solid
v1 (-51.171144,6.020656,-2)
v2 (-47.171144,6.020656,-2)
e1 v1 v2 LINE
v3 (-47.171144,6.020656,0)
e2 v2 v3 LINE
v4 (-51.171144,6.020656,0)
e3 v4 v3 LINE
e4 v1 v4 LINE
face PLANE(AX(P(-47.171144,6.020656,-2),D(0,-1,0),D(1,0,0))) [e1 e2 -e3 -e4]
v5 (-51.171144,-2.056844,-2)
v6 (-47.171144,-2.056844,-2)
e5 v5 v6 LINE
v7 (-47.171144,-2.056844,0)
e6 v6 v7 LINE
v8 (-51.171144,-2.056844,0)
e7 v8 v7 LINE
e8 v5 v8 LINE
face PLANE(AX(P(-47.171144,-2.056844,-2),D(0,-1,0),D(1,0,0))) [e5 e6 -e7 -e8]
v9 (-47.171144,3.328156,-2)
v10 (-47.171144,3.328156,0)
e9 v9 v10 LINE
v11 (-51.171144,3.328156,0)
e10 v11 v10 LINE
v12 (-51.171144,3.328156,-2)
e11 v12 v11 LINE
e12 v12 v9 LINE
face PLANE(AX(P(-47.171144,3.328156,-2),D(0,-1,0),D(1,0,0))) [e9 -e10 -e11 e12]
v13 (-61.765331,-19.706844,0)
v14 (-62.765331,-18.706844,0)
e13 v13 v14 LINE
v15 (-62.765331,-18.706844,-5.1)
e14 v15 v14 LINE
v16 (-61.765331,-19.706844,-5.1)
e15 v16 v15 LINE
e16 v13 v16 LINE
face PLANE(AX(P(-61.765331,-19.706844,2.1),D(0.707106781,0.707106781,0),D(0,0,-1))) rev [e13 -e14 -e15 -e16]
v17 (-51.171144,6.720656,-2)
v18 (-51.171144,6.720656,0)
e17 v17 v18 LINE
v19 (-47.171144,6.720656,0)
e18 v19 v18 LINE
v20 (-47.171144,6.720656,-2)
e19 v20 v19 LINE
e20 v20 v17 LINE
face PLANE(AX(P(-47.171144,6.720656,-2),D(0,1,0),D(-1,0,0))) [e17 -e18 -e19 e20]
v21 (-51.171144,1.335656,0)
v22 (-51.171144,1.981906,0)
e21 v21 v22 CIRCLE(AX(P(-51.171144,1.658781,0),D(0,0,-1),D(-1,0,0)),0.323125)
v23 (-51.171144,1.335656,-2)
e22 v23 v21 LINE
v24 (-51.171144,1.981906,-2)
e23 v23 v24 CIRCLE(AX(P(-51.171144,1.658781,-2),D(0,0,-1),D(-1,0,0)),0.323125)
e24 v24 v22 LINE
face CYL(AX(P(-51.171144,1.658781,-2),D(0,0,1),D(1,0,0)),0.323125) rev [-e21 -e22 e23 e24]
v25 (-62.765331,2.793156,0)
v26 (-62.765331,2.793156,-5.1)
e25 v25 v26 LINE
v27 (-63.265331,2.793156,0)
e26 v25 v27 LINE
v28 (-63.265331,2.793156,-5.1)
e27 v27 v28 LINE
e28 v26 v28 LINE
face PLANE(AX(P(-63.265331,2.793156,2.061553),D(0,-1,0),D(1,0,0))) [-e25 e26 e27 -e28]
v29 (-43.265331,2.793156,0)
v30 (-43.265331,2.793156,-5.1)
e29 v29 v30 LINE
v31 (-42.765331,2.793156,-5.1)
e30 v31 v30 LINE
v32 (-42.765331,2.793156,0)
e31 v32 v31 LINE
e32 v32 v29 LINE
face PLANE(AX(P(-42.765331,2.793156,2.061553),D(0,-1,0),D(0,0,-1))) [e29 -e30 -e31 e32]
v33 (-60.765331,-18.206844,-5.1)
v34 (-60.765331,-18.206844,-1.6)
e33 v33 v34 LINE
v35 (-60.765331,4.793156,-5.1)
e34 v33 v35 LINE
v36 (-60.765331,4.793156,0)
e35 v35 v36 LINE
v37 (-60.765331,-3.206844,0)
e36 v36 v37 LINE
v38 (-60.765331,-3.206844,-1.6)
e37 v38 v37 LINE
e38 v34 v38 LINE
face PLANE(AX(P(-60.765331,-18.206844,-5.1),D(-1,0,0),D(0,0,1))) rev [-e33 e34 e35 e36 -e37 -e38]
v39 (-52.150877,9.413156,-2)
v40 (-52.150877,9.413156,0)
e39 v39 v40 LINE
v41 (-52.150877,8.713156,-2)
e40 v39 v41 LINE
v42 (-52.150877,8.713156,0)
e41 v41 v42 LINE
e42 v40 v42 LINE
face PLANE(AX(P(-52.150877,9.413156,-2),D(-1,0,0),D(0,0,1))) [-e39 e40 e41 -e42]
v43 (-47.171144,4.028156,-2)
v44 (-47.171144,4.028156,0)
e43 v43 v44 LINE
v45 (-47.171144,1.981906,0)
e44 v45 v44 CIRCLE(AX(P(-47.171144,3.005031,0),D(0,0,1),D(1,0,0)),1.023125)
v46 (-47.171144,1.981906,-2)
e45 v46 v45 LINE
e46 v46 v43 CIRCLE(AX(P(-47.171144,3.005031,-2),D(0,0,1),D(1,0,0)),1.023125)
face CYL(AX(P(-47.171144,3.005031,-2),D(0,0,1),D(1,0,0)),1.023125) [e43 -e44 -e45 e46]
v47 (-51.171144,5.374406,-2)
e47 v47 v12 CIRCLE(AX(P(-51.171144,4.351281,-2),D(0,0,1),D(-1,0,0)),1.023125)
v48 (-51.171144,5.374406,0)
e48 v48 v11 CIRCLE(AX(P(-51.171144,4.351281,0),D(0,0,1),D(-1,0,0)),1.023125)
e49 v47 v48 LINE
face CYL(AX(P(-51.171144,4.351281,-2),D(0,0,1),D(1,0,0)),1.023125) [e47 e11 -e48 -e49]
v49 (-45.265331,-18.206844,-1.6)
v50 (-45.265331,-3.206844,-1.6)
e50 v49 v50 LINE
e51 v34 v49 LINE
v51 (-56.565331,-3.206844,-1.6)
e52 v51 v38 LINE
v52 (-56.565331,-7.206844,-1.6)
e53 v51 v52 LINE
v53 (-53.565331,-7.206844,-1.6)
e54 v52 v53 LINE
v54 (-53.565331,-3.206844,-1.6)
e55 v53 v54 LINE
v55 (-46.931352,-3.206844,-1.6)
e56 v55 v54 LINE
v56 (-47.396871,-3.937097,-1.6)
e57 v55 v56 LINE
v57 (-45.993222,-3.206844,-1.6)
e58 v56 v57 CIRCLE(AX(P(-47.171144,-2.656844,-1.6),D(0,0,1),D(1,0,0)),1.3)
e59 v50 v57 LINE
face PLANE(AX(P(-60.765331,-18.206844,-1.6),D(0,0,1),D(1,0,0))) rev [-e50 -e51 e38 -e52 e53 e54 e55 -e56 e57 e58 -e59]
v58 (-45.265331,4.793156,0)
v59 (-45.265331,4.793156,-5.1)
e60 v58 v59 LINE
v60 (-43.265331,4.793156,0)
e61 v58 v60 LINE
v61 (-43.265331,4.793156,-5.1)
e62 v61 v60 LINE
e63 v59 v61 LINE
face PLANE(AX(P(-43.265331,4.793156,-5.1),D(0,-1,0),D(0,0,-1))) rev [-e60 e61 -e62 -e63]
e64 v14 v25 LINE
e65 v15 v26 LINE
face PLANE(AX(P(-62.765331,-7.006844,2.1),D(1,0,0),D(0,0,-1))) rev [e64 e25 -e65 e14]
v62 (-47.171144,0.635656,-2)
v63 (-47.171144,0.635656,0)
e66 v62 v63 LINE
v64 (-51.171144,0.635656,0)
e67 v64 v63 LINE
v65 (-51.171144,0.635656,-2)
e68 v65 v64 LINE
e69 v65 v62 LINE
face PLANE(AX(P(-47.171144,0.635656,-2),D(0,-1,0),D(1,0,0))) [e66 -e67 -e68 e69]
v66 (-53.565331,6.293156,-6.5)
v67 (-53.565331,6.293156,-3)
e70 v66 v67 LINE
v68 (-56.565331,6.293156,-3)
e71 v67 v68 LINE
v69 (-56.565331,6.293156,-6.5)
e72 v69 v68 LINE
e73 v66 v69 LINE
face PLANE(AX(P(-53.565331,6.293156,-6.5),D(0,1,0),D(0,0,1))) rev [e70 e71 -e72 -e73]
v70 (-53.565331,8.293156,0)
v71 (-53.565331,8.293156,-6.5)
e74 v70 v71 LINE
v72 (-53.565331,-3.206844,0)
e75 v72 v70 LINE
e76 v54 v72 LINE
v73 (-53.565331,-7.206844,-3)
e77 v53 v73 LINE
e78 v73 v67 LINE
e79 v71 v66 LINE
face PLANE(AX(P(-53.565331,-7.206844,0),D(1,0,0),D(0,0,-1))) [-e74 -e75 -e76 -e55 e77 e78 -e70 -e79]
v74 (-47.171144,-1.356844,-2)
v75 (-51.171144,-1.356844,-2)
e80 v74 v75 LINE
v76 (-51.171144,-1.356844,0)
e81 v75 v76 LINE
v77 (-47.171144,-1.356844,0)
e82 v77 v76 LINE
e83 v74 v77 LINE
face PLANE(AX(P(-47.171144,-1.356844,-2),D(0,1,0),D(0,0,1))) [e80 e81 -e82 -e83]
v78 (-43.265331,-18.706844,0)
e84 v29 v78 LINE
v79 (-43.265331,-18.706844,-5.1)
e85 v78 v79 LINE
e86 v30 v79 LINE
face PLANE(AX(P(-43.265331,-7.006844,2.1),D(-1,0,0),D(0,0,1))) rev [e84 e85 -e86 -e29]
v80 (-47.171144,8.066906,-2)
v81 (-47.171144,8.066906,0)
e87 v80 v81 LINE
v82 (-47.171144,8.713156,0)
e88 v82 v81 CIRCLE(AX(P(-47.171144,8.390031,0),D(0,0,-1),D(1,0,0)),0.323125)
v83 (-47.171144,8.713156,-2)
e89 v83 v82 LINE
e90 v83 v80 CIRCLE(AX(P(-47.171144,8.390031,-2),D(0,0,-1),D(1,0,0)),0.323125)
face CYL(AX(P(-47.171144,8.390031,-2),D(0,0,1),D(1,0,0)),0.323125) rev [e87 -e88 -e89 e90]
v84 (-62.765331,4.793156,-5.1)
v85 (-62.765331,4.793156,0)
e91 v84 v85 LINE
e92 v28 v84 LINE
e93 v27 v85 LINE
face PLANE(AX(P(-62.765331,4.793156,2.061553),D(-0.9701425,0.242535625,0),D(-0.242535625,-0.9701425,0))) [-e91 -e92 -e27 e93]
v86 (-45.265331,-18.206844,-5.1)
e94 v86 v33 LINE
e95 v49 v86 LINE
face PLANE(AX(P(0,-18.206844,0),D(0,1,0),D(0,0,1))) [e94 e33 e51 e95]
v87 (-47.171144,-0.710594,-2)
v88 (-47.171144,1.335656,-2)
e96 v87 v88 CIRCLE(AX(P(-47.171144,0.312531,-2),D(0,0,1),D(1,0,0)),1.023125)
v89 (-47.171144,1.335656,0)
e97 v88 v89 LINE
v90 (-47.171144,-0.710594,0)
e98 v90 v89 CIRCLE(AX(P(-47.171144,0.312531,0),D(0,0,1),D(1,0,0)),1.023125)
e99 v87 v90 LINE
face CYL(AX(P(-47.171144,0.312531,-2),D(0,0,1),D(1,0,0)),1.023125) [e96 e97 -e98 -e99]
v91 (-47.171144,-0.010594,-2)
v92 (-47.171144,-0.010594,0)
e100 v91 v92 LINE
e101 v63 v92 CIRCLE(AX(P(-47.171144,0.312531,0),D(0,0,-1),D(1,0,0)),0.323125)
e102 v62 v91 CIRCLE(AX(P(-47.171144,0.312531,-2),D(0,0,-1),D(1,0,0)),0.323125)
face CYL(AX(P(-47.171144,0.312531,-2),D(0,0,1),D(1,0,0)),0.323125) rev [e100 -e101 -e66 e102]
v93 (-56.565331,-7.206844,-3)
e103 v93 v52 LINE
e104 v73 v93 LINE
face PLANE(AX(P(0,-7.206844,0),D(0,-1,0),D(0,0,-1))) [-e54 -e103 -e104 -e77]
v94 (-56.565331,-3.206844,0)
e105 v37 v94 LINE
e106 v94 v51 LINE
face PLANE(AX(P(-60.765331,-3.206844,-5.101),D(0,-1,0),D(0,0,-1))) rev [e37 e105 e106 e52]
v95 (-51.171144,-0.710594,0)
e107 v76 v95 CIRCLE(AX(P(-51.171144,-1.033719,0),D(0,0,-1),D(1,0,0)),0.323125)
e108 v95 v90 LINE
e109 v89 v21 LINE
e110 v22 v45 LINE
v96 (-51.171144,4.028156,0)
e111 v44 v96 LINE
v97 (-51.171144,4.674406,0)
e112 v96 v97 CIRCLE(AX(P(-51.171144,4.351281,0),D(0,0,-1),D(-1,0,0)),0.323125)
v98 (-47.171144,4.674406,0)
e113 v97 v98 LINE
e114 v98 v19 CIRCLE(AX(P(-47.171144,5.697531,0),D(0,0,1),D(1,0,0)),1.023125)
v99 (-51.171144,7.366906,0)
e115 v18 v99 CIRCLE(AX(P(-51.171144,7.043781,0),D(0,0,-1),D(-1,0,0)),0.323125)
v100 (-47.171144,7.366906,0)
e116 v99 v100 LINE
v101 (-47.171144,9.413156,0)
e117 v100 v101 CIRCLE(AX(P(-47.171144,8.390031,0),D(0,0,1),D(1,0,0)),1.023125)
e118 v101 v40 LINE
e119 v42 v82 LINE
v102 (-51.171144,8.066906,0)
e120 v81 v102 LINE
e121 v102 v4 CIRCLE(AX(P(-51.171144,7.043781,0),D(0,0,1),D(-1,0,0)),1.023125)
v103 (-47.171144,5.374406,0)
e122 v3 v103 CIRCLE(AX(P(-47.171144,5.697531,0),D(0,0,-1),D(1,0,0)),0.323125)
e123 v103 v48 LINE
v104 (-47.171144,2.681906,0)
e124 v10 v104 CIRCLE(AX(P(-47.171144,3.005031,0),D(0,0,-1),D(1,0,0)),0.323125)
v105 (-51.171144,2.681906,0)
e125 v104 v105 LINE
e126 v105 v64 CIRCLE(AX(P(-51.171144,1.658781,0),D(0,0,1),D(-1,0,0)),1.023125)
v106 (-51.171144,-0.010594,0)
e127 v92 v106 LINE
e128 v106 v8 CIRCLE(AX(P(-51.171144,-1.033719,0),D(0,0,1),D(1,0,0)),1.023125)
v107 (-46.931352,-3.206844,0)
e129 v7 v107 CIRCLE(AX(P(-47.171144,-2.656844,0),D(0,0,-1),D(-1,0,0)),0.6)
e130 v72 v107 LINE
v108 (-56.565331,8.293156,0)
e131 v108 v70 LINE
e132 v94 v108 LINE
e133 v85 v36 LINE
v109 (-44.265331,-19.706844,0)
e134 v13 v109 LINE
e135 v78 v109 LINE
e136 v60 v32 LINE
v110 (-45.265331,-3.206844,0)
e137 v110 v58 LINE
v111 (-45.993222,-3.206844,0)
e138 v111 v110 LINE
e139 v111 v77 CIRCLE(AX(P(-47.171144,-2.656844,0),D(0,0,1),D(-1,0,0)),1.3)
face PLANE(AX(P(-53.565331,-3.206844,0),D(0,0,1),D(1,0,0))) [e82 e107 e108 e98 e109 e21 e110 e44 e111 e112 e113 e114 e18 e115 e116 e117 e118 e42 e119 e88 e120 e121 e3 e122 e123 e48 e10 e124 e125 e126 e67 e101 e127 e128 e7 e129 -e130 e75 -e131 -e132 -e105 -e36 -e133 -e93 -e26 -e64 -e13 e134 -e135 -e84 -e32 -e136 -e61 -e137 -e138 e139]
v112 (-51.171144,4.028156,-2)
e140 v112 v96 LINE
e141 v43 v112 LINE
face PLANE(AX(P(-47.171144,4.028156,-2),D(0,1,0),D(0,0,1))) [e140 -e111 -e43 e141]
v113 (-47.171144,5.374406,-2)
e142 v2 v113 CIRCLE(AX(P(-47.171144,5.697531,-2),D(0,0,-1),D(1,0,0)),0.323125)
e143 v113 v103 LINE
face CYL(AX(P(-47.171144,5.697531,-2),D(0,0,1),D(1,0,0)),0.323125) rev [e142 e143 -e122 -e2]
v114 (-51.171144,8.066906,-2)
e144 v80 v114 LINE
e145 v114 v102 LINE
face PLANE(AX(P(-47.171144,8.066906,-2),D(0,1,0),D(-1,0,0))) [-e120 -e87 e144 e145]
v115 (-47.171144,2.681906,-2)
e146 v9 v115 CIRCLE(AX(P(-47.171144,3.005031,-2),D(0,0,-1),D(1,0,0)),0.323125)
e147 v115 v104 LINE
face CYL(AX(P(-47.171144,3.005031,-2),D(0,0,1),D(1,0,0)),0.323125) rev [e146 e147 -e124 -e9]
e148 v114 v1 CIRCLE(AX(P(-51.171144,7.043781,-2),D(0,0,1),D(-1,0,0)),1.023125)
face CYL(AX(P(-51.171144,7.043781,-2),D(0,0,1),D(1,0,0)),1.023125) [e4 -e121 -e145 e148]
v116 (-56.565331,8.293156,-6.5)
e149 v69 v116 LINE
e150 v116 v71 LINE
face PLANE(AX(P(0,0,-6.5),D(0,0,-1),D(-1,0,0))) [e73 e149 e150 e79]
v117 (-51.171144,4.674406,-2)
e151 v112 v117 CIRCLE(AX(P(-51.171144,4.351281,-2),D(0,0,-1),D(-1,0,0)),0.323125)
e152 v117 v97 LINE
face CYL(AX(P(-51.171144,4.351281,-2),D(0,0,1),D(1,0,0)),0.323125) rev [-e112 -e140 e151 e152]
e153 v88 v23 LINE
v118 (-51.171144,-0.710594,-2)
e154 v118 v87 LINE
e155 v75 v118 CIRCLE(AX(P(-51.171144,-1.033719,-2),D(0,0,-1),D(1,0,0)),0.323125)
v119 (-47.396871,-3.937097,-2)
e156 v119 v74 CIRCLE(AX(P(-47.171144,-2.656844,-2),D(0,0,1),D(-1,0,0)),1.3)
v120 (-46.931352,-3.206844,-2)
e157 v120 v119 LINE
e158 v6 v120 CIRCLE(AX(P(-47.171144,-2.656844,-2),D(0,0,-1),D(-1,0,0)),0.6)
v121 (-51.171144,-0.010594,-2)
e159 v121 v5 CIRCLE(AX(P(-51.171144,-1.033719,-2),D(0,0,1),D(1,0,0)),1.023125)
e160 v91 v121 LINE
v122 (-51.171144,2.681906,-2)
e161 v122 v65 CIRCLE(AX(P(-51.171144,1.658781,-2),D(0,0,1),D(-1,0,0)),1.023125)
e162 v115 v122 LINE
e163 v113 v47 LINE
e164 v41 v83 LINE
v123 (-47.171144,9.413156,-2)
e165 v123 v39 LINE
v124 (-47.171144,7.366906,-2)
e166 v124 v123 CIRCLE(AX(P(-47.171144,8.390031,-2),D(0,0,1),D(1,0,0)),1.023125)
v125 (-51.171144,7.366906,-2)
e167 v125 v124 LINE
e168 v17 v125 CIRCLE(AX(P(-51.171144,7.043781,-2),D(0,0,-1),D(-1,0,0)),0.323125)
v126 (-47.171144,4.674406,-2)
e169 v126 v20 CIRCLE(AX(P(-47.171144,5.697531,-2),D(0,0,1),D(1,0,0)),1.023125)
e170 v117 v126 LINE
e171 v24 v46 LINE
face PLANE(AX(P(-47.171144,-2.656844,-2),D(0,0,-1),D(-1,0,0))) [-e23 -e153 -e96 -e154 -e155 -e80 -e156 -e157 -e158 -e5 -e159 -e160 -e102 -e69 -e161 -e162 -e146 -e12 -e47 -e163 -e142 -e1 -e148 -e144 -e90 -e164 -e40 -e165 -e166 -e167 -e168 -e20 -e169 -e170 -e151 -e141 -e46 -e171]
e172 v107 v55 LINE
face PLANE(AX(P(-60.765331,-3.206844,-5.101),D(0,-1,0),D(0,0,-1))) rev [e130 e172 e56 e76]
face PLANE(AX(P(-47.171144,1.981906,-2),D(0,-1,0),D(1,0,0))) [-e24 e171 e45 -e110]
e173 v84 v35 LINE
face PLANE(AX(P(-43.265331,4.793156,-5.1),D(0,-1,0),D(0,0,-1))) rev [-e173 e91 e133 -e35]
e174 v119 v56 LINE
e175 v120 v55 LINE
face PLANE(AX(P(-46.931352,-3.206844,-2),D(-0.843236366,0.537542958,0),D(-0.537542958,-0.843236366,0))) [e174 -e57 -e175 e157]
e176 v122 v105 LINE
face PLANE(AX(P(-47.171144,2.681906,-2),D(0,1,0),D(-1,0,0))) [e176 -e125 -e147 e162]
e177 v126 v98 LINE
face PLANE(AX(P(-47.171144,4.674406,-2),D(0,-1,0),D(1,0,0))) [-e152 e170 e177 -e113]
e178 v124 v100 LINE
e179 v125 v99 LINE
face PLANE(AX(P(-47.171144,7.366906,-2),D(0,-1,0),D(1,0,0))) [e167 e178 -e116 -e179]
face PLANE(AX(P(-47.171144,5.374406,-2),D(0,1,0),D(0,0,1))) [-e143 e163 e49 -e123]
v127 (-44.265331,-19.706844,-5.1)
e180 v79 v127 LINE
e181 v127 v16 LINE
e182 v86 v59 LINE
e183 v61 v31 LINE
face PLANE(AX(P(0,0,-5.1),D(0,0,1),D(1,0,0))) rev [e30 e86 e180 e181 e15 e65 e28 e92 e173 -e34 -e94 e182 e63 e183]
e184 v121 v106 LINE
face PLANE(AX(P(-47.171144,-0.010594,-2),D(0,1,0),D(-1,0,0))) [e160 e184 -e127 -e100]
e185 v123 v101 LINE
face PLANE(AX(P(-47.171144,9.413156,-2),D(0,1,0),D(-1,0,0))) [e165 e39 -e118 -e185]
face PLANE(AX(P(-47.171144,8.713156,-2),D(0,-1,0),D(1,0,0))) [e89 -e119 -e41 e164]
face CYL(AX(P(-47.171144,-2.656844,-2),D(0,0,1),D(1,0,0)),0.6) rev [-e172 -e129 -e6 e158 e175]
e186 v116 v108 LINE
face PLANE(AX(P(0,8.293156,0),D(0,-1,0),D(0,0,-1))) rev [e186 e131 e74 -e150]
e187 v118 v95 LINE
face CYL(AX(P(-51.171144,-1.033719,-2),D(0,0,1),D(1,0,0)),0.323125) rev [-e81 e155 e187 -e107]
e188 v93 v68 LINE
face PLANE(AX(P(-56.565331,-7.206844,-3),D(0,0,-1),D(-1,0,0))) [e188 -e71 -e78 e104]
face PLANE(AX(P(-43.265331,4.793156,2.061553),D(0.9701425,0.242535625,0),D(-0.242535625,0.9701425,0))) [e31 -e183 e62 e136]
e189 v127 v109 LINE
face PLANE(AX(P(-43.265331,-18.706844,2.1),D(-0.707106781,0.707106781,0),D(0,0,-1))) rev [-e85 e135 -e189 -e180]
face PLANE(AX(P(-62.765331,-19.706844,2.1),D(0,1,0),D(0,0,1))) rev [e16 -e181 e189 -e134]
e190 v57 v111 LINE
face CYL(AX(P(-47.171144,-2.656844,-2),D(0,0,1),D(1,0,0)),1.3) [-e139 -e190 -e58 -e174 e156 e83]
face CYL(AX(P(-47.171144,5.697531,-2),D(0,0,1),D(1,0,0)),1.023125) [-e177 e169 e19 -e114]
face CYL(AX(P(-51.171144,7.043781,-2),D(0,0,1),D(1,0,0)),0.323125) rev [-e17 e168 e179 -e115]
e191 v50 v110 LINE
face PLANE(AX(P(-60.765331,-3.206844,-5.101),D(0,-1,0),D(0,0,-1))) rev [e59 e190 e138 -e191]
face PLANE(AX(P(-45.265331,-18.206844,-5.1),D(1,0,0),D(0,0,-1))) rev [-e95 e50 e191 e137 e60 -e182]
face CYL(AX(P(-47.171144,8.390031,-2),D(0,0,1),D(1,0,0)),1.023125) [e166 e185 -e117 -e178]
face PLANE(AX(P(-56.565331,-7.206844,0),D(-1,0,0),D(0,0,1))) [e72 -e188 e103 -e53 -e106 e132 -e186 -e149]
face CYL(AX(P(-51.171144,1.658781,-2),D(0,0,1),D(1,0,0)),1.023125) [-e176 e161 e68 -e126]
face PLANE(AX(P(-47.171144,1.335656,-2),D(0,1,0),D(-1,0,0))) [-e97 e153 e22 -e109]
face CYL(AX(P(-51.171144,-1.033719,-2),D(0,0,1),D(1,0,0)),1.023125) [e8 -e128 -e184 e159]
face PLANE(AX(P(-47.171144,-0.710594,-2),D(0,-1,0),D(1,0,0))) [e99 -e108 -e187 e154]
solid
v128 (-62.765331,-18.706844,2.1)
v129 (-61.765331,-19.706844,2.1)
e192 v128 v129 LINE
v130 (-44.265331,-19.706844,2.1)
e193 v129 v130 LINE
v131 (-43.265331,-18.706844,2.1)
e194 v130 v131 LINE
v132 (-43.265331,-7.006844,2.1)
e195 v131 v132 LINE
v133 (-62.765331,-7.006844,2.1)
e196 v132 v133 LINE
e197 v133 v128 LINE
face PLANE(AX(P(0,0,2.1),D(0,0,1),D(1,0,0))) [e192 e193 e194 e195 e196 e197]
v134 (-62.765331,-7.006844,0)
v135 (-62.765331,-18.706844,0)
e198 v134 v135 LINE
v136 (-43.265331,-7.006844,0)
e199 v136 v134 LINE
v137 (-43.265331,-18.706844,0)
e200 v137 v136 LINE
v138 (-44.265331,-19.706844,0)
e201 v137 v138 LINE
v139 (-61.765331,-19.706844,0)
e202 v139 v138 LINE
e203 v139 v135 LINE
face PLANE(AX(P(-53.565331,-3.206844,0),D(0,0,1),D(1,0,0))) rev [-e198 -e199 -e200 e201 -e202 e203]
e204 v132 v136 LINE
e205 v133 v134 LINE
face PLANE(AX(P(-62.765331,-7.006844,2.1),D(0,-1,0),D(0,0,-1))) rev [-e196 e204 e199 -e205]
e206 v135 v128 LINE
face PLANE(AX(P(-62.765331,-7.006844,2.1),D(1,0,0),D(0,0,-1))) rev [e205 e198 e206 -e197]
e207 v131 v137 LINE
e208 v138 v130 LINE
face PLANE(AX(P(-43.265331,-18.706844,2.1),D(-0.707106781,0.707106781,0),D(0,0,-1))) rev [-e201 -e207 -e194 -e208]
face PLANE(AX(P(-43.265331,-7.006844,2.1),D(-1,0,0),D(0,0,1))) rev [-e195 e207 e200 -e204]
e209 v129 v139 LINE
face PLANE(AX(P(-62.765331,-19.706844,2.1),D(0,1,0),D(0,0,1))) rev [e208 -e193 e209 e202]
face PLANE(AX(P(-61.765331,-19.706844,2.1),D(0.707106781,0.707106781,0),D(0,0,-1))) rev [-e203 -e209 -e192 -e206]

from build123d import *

# Parameters (mm, degrees)
SKETCH_1_W           = 19.5
SKETCH_1_H           = 12.7
EXTRUDE_1_DEPTH      = 2.1
SKETCH_2_W           = 19.5
SKETCH_2_H           = 24.5
EXTRUDE_2_DEPTH      = 5.1
SKETCH_3_W           = 15.5
SKETCH_3_H           = 3.5
CUT_EXTRUDE_1_DEPTH  = 23
CUT_EXTRUDE_2_REACH  = 67.984
SKETCH_4_W           = 15.5
SKETCH_4_H           = 8
EXTRUDE_4_DEPTH      = 5.1
EXTRUDE_5_DEPTH      = 2
EXTRUDE_6_DEPTH      = 11.5
EXTRUDE_6_DEPTH_BACK = 4
SKETCH_8_W           = 3
SKETCH_8_H           = 3
SKETCH_9_W           = 3
SKETCH_9_H           = 2
EXTRUDE_7_DEPTH      = 3.5
CHAMFER_1_SIZE       = 1


# Read off the part's stored shape, not the designer's step: 分割1
with BuildPart() as part:
    # 草图1 → 凸台-拉伸1 (new body)
    with BuildSketch(Plane.XY):
        with Locations((-53.015330564, -13.356843897)):
            Rectangle(SKETCH_1_W, SKETCH_1_H)
    extrude(amount=EXTRUDE_1_DEPTH)

    # 草图2 → 凸台-拉伸2 (add)
    with BuildSketch(Plane(origin=(0, 0, 0), x_dir=(-1, 0, 0), z_dir=(0, 0, -1))):
        with Locations((53.015330564, -7.456843897)):
            Rectangle(SKETCH_2_W, SKETCH_2_H)
    extrude(amount=EXTRUDE_2_DEPTH)

    # 草图3 → 切除-拉伸1 (cut)
    with BuildSketch(Plane(origin=(0, 4.793156103, 0), x_dir=(1, 0, 0), z_dir=(0, 1, 0))):
        with Locations((-53.015330564, 3.35)):
            Rectangle(SKETCH_3_W, SKETCH_3_H)
    extrude(amount=-CUT_EXTRUDE_1_DEPTH, mode=Mode.SUBTRACT)

    # 草图4 → 切除-拉伸2 (cut, up to next)
    with BuildSketch(Plane.XY, mode=Mode.PRIVATE) as cut_extrude_2_sk1:
        with Locations((-53.015330564, 0.793156103)):
            Rectangle(SKETCH_4_W, SKETCH_4_H)
    cut_extrude_2_tool1 = extrude(cut_extrude_2_sk1.sketch, amount=-CUT_EXTRUDE_2_REACH, mode=Mode.PRIVATE) & part.part
    add(cut_extrude_2_tool1.solids().sort_by_distance((-53.015331, 0.793156, 0))[0], mode=Mode.SUBTRACT)

    # 草图5 → 凸台-拉伸4 (add)
    with BuildSketch(Plane(origin=(0, 0, -5.1), x_dir=(-1, 0, 0), z_dir=(0, 0, -1))):
        Polygon((62.765330564, 4.793156103), (63.265330564, 2.793156103), (62.765330564, 2.793156103), align=None)
        Polygon((43.265330564, 4.793156103), (42.765330564, 2.793156103), (43.265330564, 2.793156103), align=None)
    extrude(amount=-EXTRUDE_4_DEPTH)

    # 草图7 → 凸台-拉伸5 (add)
    with BuildSketch(Plane.XY):
        with BuildLine():
            Line((-47.171144023, -1.356843897), (-51.171144023, -1.356843897))
            ThreePointArc((-51.171144023, -1.356843897), (-51.494269023, -1.033718897), (-51.171144023, -0.710593897))
            Line((-51.171144023, -0.710593897), (-47.171144023, -0.710593897))
            ThreePointArc((-47.171144023, -0.710593897), (-46.148019023, 0.312531103), (-47.171144023, 1.335656103))
            Line((-47.171144023, 1.335656103), (-51.171144023, 1.335656103))
            ThreePointArc((-51.171144023, 1.335656103), (-51.494269023, 1.658781103), (-51.171144023, 1.981906103))
            Line((-51.171144023, 1.981906103), (-47.171144023, 1.981906103))
            ThreePointArc((-47.171144023, 1.981906103), (-46.148019023, 3.005031103), (-47.171144023, 4.028156103))
            Line((-47.171144023, 4.028156103), (-51.171144023, 4.028156103))
            ThreePointArc((-51.171144023, 4.028156103), (-51.494269023, 4.351281103), (-51.171144023, 4.674406103))
            Line((-51.171144023, 4.674406103), (-47.171144023, 4.674406103))
            ThreePointArc((-47.171144023, 4.674406103), (-46.148019023, 5.697531103), (-47.171144023, 6.720656103))
            Line((-47.171144023, 6.720656103), (-51.171144023, 6.720656103))
            ThreePointArc((-51.171144023, 6.720656103), (-51.494269023, 7.043781103), (-51.171144023, 7.366906103))
            Line((-51.171144023, 7.366906103), (-47.171144023, 7.366906103))
            ThreePointArc((-47.171144023, 7.366906103), (-46.148019023, 8.390031103), (-47.171144023, 9.413156103))
            Line((-47.171144023, 9.413156103), (-52.150877486, 9.413156103))
            Line((-52.150877486, 9.413156103), (-52.150877486, 8.713156103))
            Line((-52.150877486, 8.713156103), (-47.171144023, 8.713156103))
            ThreePointArc((-47.171144023, 8.713156103), (-46.848019023, 8.390031103), (-47.171144023, 8.066906103))
            Line((-47.171144023, 8.066906103), (-51.171144023, 8.066906103))
            ThreePointArc((-51.171144023, 8.066906103), (-52.194269023, 7.043781103), (-51.171144023, 6.020656103))
            Line((-51.171144023, 6.020656103), (-47.171144023, 6.020656103))
            ThreePointArc((-47.171144023, 6.020656103), (-46.848019023, 5.697531103), (-47.171144023, 5.374406103))
            Line((-47.171144023, 5.374406103), (-51.171144023, 5.374406103))
            ThreePointArc((-51.171144023, 5.374406103), (-52.194269023, 4.351281103), (-51.171144023, 3.328156103))
            Line((-51.171144023, 3.328156103), (-47.171144023, 3.328156103))
            ThreePointArc((-47.171144023, 3.328156103), (-46.848019023, 3.005031103), (-47.171144023, 2.681906103))
            Line((-47.171144023, 2.681906103), (-51.171144023, 2.681906103))
            ThreePointArc((-51.171144023, 2.681906103), (-52.194269023, 1.658781103), (-51.171144023, 0.635656103))
            Line((-51.171144023, 0.635656103), (-47.171144023, 0.635656103))
            ThreePointArc((-47.171144023, 0.635656103), (-46.848019023, 0.312531103), (-47.171144023, -0.010593897))
            Line((-47.171144023, -0.010593897), (-51.171144023, -0.010593897))
            ThreePointArc((-51.171144023, -0.010593897), (-52.194269023, -1.033718897), (-51.171144023, -2.056843897))
            Line((-51.171144023, -2.056843897), (-47.171144023, -2.056843897))
            ThreePointArc((-47.171144023, -2.056843897), (-46.583777016, -2.53436941), (-46.931352446, -3.206843897))
            Line((-46.931352446, -3.206843897), (-47.396871104, -3.937096718))
            ThreePointArc((-47.396871104, -3.937096718), (-45.876090227, -2.770138498), (-47.171144023, -1.356843897))
        make_face()
    extrude(amount=-EXTRUDE_5_DEPTH)

    # 草图8 → 凸台-拉伸6 (add, two sides: drawn at the far end of the back side and taken through both)
    with BuildSketch(Plane(origin=(0, -3.206843897, 0), x_dir=(1, 0, 0), z_dir=(0, 1, 0)).offset(-EXTRUDE_6_DEPTH_BACK)):
        with Locations((-55.065330564, 1.5)):
            Rectangle(SKETCH_8_W, SKETCH_8_H)
    extrude(amount=EXTRUDE_6_DEPTH + EXTRUDE_6_DEPTH_BACK)

    # 草图9 → 凸台-拉伸7 (add)
    with BuildSketch(Plane(origin=(0, 0, -3), x_dir=(-1, 0, 0), z_dir=(0, 0, -1))):
        with Locations((55.065330564, 7.293156103)):
            Rectangle(SKETCH_9_W, SKETCH_9_H)
    extrude(amount=EXTRUDE_7_DEPTH)

    # 倒角1
    chamfer_1_edges = [part.edges().sort_by_distance(p)[0] for p in [
        (-43.265330564, -19.706843897, -1.5),
        (-62.765330564, -19.706843897, -1.5),
    ]]
    chamfer(chamfer_1_edges, length=CHAMFER_1_SIZE)


with BuildPart() as body_2:
    # Split Bodies 1: the piece on the far side of the plane
    add(part.part)
    split(bisect_by=Plane.XY, keep=Keep.BOTTOM)


with BuildPart() as part_1:
    add(part.part)

    # Split Bodies 1
    split(bisect_by=Plane.XY, keep=Keep.TOP)


solid = Compound([body_2.part, part_1.part])
